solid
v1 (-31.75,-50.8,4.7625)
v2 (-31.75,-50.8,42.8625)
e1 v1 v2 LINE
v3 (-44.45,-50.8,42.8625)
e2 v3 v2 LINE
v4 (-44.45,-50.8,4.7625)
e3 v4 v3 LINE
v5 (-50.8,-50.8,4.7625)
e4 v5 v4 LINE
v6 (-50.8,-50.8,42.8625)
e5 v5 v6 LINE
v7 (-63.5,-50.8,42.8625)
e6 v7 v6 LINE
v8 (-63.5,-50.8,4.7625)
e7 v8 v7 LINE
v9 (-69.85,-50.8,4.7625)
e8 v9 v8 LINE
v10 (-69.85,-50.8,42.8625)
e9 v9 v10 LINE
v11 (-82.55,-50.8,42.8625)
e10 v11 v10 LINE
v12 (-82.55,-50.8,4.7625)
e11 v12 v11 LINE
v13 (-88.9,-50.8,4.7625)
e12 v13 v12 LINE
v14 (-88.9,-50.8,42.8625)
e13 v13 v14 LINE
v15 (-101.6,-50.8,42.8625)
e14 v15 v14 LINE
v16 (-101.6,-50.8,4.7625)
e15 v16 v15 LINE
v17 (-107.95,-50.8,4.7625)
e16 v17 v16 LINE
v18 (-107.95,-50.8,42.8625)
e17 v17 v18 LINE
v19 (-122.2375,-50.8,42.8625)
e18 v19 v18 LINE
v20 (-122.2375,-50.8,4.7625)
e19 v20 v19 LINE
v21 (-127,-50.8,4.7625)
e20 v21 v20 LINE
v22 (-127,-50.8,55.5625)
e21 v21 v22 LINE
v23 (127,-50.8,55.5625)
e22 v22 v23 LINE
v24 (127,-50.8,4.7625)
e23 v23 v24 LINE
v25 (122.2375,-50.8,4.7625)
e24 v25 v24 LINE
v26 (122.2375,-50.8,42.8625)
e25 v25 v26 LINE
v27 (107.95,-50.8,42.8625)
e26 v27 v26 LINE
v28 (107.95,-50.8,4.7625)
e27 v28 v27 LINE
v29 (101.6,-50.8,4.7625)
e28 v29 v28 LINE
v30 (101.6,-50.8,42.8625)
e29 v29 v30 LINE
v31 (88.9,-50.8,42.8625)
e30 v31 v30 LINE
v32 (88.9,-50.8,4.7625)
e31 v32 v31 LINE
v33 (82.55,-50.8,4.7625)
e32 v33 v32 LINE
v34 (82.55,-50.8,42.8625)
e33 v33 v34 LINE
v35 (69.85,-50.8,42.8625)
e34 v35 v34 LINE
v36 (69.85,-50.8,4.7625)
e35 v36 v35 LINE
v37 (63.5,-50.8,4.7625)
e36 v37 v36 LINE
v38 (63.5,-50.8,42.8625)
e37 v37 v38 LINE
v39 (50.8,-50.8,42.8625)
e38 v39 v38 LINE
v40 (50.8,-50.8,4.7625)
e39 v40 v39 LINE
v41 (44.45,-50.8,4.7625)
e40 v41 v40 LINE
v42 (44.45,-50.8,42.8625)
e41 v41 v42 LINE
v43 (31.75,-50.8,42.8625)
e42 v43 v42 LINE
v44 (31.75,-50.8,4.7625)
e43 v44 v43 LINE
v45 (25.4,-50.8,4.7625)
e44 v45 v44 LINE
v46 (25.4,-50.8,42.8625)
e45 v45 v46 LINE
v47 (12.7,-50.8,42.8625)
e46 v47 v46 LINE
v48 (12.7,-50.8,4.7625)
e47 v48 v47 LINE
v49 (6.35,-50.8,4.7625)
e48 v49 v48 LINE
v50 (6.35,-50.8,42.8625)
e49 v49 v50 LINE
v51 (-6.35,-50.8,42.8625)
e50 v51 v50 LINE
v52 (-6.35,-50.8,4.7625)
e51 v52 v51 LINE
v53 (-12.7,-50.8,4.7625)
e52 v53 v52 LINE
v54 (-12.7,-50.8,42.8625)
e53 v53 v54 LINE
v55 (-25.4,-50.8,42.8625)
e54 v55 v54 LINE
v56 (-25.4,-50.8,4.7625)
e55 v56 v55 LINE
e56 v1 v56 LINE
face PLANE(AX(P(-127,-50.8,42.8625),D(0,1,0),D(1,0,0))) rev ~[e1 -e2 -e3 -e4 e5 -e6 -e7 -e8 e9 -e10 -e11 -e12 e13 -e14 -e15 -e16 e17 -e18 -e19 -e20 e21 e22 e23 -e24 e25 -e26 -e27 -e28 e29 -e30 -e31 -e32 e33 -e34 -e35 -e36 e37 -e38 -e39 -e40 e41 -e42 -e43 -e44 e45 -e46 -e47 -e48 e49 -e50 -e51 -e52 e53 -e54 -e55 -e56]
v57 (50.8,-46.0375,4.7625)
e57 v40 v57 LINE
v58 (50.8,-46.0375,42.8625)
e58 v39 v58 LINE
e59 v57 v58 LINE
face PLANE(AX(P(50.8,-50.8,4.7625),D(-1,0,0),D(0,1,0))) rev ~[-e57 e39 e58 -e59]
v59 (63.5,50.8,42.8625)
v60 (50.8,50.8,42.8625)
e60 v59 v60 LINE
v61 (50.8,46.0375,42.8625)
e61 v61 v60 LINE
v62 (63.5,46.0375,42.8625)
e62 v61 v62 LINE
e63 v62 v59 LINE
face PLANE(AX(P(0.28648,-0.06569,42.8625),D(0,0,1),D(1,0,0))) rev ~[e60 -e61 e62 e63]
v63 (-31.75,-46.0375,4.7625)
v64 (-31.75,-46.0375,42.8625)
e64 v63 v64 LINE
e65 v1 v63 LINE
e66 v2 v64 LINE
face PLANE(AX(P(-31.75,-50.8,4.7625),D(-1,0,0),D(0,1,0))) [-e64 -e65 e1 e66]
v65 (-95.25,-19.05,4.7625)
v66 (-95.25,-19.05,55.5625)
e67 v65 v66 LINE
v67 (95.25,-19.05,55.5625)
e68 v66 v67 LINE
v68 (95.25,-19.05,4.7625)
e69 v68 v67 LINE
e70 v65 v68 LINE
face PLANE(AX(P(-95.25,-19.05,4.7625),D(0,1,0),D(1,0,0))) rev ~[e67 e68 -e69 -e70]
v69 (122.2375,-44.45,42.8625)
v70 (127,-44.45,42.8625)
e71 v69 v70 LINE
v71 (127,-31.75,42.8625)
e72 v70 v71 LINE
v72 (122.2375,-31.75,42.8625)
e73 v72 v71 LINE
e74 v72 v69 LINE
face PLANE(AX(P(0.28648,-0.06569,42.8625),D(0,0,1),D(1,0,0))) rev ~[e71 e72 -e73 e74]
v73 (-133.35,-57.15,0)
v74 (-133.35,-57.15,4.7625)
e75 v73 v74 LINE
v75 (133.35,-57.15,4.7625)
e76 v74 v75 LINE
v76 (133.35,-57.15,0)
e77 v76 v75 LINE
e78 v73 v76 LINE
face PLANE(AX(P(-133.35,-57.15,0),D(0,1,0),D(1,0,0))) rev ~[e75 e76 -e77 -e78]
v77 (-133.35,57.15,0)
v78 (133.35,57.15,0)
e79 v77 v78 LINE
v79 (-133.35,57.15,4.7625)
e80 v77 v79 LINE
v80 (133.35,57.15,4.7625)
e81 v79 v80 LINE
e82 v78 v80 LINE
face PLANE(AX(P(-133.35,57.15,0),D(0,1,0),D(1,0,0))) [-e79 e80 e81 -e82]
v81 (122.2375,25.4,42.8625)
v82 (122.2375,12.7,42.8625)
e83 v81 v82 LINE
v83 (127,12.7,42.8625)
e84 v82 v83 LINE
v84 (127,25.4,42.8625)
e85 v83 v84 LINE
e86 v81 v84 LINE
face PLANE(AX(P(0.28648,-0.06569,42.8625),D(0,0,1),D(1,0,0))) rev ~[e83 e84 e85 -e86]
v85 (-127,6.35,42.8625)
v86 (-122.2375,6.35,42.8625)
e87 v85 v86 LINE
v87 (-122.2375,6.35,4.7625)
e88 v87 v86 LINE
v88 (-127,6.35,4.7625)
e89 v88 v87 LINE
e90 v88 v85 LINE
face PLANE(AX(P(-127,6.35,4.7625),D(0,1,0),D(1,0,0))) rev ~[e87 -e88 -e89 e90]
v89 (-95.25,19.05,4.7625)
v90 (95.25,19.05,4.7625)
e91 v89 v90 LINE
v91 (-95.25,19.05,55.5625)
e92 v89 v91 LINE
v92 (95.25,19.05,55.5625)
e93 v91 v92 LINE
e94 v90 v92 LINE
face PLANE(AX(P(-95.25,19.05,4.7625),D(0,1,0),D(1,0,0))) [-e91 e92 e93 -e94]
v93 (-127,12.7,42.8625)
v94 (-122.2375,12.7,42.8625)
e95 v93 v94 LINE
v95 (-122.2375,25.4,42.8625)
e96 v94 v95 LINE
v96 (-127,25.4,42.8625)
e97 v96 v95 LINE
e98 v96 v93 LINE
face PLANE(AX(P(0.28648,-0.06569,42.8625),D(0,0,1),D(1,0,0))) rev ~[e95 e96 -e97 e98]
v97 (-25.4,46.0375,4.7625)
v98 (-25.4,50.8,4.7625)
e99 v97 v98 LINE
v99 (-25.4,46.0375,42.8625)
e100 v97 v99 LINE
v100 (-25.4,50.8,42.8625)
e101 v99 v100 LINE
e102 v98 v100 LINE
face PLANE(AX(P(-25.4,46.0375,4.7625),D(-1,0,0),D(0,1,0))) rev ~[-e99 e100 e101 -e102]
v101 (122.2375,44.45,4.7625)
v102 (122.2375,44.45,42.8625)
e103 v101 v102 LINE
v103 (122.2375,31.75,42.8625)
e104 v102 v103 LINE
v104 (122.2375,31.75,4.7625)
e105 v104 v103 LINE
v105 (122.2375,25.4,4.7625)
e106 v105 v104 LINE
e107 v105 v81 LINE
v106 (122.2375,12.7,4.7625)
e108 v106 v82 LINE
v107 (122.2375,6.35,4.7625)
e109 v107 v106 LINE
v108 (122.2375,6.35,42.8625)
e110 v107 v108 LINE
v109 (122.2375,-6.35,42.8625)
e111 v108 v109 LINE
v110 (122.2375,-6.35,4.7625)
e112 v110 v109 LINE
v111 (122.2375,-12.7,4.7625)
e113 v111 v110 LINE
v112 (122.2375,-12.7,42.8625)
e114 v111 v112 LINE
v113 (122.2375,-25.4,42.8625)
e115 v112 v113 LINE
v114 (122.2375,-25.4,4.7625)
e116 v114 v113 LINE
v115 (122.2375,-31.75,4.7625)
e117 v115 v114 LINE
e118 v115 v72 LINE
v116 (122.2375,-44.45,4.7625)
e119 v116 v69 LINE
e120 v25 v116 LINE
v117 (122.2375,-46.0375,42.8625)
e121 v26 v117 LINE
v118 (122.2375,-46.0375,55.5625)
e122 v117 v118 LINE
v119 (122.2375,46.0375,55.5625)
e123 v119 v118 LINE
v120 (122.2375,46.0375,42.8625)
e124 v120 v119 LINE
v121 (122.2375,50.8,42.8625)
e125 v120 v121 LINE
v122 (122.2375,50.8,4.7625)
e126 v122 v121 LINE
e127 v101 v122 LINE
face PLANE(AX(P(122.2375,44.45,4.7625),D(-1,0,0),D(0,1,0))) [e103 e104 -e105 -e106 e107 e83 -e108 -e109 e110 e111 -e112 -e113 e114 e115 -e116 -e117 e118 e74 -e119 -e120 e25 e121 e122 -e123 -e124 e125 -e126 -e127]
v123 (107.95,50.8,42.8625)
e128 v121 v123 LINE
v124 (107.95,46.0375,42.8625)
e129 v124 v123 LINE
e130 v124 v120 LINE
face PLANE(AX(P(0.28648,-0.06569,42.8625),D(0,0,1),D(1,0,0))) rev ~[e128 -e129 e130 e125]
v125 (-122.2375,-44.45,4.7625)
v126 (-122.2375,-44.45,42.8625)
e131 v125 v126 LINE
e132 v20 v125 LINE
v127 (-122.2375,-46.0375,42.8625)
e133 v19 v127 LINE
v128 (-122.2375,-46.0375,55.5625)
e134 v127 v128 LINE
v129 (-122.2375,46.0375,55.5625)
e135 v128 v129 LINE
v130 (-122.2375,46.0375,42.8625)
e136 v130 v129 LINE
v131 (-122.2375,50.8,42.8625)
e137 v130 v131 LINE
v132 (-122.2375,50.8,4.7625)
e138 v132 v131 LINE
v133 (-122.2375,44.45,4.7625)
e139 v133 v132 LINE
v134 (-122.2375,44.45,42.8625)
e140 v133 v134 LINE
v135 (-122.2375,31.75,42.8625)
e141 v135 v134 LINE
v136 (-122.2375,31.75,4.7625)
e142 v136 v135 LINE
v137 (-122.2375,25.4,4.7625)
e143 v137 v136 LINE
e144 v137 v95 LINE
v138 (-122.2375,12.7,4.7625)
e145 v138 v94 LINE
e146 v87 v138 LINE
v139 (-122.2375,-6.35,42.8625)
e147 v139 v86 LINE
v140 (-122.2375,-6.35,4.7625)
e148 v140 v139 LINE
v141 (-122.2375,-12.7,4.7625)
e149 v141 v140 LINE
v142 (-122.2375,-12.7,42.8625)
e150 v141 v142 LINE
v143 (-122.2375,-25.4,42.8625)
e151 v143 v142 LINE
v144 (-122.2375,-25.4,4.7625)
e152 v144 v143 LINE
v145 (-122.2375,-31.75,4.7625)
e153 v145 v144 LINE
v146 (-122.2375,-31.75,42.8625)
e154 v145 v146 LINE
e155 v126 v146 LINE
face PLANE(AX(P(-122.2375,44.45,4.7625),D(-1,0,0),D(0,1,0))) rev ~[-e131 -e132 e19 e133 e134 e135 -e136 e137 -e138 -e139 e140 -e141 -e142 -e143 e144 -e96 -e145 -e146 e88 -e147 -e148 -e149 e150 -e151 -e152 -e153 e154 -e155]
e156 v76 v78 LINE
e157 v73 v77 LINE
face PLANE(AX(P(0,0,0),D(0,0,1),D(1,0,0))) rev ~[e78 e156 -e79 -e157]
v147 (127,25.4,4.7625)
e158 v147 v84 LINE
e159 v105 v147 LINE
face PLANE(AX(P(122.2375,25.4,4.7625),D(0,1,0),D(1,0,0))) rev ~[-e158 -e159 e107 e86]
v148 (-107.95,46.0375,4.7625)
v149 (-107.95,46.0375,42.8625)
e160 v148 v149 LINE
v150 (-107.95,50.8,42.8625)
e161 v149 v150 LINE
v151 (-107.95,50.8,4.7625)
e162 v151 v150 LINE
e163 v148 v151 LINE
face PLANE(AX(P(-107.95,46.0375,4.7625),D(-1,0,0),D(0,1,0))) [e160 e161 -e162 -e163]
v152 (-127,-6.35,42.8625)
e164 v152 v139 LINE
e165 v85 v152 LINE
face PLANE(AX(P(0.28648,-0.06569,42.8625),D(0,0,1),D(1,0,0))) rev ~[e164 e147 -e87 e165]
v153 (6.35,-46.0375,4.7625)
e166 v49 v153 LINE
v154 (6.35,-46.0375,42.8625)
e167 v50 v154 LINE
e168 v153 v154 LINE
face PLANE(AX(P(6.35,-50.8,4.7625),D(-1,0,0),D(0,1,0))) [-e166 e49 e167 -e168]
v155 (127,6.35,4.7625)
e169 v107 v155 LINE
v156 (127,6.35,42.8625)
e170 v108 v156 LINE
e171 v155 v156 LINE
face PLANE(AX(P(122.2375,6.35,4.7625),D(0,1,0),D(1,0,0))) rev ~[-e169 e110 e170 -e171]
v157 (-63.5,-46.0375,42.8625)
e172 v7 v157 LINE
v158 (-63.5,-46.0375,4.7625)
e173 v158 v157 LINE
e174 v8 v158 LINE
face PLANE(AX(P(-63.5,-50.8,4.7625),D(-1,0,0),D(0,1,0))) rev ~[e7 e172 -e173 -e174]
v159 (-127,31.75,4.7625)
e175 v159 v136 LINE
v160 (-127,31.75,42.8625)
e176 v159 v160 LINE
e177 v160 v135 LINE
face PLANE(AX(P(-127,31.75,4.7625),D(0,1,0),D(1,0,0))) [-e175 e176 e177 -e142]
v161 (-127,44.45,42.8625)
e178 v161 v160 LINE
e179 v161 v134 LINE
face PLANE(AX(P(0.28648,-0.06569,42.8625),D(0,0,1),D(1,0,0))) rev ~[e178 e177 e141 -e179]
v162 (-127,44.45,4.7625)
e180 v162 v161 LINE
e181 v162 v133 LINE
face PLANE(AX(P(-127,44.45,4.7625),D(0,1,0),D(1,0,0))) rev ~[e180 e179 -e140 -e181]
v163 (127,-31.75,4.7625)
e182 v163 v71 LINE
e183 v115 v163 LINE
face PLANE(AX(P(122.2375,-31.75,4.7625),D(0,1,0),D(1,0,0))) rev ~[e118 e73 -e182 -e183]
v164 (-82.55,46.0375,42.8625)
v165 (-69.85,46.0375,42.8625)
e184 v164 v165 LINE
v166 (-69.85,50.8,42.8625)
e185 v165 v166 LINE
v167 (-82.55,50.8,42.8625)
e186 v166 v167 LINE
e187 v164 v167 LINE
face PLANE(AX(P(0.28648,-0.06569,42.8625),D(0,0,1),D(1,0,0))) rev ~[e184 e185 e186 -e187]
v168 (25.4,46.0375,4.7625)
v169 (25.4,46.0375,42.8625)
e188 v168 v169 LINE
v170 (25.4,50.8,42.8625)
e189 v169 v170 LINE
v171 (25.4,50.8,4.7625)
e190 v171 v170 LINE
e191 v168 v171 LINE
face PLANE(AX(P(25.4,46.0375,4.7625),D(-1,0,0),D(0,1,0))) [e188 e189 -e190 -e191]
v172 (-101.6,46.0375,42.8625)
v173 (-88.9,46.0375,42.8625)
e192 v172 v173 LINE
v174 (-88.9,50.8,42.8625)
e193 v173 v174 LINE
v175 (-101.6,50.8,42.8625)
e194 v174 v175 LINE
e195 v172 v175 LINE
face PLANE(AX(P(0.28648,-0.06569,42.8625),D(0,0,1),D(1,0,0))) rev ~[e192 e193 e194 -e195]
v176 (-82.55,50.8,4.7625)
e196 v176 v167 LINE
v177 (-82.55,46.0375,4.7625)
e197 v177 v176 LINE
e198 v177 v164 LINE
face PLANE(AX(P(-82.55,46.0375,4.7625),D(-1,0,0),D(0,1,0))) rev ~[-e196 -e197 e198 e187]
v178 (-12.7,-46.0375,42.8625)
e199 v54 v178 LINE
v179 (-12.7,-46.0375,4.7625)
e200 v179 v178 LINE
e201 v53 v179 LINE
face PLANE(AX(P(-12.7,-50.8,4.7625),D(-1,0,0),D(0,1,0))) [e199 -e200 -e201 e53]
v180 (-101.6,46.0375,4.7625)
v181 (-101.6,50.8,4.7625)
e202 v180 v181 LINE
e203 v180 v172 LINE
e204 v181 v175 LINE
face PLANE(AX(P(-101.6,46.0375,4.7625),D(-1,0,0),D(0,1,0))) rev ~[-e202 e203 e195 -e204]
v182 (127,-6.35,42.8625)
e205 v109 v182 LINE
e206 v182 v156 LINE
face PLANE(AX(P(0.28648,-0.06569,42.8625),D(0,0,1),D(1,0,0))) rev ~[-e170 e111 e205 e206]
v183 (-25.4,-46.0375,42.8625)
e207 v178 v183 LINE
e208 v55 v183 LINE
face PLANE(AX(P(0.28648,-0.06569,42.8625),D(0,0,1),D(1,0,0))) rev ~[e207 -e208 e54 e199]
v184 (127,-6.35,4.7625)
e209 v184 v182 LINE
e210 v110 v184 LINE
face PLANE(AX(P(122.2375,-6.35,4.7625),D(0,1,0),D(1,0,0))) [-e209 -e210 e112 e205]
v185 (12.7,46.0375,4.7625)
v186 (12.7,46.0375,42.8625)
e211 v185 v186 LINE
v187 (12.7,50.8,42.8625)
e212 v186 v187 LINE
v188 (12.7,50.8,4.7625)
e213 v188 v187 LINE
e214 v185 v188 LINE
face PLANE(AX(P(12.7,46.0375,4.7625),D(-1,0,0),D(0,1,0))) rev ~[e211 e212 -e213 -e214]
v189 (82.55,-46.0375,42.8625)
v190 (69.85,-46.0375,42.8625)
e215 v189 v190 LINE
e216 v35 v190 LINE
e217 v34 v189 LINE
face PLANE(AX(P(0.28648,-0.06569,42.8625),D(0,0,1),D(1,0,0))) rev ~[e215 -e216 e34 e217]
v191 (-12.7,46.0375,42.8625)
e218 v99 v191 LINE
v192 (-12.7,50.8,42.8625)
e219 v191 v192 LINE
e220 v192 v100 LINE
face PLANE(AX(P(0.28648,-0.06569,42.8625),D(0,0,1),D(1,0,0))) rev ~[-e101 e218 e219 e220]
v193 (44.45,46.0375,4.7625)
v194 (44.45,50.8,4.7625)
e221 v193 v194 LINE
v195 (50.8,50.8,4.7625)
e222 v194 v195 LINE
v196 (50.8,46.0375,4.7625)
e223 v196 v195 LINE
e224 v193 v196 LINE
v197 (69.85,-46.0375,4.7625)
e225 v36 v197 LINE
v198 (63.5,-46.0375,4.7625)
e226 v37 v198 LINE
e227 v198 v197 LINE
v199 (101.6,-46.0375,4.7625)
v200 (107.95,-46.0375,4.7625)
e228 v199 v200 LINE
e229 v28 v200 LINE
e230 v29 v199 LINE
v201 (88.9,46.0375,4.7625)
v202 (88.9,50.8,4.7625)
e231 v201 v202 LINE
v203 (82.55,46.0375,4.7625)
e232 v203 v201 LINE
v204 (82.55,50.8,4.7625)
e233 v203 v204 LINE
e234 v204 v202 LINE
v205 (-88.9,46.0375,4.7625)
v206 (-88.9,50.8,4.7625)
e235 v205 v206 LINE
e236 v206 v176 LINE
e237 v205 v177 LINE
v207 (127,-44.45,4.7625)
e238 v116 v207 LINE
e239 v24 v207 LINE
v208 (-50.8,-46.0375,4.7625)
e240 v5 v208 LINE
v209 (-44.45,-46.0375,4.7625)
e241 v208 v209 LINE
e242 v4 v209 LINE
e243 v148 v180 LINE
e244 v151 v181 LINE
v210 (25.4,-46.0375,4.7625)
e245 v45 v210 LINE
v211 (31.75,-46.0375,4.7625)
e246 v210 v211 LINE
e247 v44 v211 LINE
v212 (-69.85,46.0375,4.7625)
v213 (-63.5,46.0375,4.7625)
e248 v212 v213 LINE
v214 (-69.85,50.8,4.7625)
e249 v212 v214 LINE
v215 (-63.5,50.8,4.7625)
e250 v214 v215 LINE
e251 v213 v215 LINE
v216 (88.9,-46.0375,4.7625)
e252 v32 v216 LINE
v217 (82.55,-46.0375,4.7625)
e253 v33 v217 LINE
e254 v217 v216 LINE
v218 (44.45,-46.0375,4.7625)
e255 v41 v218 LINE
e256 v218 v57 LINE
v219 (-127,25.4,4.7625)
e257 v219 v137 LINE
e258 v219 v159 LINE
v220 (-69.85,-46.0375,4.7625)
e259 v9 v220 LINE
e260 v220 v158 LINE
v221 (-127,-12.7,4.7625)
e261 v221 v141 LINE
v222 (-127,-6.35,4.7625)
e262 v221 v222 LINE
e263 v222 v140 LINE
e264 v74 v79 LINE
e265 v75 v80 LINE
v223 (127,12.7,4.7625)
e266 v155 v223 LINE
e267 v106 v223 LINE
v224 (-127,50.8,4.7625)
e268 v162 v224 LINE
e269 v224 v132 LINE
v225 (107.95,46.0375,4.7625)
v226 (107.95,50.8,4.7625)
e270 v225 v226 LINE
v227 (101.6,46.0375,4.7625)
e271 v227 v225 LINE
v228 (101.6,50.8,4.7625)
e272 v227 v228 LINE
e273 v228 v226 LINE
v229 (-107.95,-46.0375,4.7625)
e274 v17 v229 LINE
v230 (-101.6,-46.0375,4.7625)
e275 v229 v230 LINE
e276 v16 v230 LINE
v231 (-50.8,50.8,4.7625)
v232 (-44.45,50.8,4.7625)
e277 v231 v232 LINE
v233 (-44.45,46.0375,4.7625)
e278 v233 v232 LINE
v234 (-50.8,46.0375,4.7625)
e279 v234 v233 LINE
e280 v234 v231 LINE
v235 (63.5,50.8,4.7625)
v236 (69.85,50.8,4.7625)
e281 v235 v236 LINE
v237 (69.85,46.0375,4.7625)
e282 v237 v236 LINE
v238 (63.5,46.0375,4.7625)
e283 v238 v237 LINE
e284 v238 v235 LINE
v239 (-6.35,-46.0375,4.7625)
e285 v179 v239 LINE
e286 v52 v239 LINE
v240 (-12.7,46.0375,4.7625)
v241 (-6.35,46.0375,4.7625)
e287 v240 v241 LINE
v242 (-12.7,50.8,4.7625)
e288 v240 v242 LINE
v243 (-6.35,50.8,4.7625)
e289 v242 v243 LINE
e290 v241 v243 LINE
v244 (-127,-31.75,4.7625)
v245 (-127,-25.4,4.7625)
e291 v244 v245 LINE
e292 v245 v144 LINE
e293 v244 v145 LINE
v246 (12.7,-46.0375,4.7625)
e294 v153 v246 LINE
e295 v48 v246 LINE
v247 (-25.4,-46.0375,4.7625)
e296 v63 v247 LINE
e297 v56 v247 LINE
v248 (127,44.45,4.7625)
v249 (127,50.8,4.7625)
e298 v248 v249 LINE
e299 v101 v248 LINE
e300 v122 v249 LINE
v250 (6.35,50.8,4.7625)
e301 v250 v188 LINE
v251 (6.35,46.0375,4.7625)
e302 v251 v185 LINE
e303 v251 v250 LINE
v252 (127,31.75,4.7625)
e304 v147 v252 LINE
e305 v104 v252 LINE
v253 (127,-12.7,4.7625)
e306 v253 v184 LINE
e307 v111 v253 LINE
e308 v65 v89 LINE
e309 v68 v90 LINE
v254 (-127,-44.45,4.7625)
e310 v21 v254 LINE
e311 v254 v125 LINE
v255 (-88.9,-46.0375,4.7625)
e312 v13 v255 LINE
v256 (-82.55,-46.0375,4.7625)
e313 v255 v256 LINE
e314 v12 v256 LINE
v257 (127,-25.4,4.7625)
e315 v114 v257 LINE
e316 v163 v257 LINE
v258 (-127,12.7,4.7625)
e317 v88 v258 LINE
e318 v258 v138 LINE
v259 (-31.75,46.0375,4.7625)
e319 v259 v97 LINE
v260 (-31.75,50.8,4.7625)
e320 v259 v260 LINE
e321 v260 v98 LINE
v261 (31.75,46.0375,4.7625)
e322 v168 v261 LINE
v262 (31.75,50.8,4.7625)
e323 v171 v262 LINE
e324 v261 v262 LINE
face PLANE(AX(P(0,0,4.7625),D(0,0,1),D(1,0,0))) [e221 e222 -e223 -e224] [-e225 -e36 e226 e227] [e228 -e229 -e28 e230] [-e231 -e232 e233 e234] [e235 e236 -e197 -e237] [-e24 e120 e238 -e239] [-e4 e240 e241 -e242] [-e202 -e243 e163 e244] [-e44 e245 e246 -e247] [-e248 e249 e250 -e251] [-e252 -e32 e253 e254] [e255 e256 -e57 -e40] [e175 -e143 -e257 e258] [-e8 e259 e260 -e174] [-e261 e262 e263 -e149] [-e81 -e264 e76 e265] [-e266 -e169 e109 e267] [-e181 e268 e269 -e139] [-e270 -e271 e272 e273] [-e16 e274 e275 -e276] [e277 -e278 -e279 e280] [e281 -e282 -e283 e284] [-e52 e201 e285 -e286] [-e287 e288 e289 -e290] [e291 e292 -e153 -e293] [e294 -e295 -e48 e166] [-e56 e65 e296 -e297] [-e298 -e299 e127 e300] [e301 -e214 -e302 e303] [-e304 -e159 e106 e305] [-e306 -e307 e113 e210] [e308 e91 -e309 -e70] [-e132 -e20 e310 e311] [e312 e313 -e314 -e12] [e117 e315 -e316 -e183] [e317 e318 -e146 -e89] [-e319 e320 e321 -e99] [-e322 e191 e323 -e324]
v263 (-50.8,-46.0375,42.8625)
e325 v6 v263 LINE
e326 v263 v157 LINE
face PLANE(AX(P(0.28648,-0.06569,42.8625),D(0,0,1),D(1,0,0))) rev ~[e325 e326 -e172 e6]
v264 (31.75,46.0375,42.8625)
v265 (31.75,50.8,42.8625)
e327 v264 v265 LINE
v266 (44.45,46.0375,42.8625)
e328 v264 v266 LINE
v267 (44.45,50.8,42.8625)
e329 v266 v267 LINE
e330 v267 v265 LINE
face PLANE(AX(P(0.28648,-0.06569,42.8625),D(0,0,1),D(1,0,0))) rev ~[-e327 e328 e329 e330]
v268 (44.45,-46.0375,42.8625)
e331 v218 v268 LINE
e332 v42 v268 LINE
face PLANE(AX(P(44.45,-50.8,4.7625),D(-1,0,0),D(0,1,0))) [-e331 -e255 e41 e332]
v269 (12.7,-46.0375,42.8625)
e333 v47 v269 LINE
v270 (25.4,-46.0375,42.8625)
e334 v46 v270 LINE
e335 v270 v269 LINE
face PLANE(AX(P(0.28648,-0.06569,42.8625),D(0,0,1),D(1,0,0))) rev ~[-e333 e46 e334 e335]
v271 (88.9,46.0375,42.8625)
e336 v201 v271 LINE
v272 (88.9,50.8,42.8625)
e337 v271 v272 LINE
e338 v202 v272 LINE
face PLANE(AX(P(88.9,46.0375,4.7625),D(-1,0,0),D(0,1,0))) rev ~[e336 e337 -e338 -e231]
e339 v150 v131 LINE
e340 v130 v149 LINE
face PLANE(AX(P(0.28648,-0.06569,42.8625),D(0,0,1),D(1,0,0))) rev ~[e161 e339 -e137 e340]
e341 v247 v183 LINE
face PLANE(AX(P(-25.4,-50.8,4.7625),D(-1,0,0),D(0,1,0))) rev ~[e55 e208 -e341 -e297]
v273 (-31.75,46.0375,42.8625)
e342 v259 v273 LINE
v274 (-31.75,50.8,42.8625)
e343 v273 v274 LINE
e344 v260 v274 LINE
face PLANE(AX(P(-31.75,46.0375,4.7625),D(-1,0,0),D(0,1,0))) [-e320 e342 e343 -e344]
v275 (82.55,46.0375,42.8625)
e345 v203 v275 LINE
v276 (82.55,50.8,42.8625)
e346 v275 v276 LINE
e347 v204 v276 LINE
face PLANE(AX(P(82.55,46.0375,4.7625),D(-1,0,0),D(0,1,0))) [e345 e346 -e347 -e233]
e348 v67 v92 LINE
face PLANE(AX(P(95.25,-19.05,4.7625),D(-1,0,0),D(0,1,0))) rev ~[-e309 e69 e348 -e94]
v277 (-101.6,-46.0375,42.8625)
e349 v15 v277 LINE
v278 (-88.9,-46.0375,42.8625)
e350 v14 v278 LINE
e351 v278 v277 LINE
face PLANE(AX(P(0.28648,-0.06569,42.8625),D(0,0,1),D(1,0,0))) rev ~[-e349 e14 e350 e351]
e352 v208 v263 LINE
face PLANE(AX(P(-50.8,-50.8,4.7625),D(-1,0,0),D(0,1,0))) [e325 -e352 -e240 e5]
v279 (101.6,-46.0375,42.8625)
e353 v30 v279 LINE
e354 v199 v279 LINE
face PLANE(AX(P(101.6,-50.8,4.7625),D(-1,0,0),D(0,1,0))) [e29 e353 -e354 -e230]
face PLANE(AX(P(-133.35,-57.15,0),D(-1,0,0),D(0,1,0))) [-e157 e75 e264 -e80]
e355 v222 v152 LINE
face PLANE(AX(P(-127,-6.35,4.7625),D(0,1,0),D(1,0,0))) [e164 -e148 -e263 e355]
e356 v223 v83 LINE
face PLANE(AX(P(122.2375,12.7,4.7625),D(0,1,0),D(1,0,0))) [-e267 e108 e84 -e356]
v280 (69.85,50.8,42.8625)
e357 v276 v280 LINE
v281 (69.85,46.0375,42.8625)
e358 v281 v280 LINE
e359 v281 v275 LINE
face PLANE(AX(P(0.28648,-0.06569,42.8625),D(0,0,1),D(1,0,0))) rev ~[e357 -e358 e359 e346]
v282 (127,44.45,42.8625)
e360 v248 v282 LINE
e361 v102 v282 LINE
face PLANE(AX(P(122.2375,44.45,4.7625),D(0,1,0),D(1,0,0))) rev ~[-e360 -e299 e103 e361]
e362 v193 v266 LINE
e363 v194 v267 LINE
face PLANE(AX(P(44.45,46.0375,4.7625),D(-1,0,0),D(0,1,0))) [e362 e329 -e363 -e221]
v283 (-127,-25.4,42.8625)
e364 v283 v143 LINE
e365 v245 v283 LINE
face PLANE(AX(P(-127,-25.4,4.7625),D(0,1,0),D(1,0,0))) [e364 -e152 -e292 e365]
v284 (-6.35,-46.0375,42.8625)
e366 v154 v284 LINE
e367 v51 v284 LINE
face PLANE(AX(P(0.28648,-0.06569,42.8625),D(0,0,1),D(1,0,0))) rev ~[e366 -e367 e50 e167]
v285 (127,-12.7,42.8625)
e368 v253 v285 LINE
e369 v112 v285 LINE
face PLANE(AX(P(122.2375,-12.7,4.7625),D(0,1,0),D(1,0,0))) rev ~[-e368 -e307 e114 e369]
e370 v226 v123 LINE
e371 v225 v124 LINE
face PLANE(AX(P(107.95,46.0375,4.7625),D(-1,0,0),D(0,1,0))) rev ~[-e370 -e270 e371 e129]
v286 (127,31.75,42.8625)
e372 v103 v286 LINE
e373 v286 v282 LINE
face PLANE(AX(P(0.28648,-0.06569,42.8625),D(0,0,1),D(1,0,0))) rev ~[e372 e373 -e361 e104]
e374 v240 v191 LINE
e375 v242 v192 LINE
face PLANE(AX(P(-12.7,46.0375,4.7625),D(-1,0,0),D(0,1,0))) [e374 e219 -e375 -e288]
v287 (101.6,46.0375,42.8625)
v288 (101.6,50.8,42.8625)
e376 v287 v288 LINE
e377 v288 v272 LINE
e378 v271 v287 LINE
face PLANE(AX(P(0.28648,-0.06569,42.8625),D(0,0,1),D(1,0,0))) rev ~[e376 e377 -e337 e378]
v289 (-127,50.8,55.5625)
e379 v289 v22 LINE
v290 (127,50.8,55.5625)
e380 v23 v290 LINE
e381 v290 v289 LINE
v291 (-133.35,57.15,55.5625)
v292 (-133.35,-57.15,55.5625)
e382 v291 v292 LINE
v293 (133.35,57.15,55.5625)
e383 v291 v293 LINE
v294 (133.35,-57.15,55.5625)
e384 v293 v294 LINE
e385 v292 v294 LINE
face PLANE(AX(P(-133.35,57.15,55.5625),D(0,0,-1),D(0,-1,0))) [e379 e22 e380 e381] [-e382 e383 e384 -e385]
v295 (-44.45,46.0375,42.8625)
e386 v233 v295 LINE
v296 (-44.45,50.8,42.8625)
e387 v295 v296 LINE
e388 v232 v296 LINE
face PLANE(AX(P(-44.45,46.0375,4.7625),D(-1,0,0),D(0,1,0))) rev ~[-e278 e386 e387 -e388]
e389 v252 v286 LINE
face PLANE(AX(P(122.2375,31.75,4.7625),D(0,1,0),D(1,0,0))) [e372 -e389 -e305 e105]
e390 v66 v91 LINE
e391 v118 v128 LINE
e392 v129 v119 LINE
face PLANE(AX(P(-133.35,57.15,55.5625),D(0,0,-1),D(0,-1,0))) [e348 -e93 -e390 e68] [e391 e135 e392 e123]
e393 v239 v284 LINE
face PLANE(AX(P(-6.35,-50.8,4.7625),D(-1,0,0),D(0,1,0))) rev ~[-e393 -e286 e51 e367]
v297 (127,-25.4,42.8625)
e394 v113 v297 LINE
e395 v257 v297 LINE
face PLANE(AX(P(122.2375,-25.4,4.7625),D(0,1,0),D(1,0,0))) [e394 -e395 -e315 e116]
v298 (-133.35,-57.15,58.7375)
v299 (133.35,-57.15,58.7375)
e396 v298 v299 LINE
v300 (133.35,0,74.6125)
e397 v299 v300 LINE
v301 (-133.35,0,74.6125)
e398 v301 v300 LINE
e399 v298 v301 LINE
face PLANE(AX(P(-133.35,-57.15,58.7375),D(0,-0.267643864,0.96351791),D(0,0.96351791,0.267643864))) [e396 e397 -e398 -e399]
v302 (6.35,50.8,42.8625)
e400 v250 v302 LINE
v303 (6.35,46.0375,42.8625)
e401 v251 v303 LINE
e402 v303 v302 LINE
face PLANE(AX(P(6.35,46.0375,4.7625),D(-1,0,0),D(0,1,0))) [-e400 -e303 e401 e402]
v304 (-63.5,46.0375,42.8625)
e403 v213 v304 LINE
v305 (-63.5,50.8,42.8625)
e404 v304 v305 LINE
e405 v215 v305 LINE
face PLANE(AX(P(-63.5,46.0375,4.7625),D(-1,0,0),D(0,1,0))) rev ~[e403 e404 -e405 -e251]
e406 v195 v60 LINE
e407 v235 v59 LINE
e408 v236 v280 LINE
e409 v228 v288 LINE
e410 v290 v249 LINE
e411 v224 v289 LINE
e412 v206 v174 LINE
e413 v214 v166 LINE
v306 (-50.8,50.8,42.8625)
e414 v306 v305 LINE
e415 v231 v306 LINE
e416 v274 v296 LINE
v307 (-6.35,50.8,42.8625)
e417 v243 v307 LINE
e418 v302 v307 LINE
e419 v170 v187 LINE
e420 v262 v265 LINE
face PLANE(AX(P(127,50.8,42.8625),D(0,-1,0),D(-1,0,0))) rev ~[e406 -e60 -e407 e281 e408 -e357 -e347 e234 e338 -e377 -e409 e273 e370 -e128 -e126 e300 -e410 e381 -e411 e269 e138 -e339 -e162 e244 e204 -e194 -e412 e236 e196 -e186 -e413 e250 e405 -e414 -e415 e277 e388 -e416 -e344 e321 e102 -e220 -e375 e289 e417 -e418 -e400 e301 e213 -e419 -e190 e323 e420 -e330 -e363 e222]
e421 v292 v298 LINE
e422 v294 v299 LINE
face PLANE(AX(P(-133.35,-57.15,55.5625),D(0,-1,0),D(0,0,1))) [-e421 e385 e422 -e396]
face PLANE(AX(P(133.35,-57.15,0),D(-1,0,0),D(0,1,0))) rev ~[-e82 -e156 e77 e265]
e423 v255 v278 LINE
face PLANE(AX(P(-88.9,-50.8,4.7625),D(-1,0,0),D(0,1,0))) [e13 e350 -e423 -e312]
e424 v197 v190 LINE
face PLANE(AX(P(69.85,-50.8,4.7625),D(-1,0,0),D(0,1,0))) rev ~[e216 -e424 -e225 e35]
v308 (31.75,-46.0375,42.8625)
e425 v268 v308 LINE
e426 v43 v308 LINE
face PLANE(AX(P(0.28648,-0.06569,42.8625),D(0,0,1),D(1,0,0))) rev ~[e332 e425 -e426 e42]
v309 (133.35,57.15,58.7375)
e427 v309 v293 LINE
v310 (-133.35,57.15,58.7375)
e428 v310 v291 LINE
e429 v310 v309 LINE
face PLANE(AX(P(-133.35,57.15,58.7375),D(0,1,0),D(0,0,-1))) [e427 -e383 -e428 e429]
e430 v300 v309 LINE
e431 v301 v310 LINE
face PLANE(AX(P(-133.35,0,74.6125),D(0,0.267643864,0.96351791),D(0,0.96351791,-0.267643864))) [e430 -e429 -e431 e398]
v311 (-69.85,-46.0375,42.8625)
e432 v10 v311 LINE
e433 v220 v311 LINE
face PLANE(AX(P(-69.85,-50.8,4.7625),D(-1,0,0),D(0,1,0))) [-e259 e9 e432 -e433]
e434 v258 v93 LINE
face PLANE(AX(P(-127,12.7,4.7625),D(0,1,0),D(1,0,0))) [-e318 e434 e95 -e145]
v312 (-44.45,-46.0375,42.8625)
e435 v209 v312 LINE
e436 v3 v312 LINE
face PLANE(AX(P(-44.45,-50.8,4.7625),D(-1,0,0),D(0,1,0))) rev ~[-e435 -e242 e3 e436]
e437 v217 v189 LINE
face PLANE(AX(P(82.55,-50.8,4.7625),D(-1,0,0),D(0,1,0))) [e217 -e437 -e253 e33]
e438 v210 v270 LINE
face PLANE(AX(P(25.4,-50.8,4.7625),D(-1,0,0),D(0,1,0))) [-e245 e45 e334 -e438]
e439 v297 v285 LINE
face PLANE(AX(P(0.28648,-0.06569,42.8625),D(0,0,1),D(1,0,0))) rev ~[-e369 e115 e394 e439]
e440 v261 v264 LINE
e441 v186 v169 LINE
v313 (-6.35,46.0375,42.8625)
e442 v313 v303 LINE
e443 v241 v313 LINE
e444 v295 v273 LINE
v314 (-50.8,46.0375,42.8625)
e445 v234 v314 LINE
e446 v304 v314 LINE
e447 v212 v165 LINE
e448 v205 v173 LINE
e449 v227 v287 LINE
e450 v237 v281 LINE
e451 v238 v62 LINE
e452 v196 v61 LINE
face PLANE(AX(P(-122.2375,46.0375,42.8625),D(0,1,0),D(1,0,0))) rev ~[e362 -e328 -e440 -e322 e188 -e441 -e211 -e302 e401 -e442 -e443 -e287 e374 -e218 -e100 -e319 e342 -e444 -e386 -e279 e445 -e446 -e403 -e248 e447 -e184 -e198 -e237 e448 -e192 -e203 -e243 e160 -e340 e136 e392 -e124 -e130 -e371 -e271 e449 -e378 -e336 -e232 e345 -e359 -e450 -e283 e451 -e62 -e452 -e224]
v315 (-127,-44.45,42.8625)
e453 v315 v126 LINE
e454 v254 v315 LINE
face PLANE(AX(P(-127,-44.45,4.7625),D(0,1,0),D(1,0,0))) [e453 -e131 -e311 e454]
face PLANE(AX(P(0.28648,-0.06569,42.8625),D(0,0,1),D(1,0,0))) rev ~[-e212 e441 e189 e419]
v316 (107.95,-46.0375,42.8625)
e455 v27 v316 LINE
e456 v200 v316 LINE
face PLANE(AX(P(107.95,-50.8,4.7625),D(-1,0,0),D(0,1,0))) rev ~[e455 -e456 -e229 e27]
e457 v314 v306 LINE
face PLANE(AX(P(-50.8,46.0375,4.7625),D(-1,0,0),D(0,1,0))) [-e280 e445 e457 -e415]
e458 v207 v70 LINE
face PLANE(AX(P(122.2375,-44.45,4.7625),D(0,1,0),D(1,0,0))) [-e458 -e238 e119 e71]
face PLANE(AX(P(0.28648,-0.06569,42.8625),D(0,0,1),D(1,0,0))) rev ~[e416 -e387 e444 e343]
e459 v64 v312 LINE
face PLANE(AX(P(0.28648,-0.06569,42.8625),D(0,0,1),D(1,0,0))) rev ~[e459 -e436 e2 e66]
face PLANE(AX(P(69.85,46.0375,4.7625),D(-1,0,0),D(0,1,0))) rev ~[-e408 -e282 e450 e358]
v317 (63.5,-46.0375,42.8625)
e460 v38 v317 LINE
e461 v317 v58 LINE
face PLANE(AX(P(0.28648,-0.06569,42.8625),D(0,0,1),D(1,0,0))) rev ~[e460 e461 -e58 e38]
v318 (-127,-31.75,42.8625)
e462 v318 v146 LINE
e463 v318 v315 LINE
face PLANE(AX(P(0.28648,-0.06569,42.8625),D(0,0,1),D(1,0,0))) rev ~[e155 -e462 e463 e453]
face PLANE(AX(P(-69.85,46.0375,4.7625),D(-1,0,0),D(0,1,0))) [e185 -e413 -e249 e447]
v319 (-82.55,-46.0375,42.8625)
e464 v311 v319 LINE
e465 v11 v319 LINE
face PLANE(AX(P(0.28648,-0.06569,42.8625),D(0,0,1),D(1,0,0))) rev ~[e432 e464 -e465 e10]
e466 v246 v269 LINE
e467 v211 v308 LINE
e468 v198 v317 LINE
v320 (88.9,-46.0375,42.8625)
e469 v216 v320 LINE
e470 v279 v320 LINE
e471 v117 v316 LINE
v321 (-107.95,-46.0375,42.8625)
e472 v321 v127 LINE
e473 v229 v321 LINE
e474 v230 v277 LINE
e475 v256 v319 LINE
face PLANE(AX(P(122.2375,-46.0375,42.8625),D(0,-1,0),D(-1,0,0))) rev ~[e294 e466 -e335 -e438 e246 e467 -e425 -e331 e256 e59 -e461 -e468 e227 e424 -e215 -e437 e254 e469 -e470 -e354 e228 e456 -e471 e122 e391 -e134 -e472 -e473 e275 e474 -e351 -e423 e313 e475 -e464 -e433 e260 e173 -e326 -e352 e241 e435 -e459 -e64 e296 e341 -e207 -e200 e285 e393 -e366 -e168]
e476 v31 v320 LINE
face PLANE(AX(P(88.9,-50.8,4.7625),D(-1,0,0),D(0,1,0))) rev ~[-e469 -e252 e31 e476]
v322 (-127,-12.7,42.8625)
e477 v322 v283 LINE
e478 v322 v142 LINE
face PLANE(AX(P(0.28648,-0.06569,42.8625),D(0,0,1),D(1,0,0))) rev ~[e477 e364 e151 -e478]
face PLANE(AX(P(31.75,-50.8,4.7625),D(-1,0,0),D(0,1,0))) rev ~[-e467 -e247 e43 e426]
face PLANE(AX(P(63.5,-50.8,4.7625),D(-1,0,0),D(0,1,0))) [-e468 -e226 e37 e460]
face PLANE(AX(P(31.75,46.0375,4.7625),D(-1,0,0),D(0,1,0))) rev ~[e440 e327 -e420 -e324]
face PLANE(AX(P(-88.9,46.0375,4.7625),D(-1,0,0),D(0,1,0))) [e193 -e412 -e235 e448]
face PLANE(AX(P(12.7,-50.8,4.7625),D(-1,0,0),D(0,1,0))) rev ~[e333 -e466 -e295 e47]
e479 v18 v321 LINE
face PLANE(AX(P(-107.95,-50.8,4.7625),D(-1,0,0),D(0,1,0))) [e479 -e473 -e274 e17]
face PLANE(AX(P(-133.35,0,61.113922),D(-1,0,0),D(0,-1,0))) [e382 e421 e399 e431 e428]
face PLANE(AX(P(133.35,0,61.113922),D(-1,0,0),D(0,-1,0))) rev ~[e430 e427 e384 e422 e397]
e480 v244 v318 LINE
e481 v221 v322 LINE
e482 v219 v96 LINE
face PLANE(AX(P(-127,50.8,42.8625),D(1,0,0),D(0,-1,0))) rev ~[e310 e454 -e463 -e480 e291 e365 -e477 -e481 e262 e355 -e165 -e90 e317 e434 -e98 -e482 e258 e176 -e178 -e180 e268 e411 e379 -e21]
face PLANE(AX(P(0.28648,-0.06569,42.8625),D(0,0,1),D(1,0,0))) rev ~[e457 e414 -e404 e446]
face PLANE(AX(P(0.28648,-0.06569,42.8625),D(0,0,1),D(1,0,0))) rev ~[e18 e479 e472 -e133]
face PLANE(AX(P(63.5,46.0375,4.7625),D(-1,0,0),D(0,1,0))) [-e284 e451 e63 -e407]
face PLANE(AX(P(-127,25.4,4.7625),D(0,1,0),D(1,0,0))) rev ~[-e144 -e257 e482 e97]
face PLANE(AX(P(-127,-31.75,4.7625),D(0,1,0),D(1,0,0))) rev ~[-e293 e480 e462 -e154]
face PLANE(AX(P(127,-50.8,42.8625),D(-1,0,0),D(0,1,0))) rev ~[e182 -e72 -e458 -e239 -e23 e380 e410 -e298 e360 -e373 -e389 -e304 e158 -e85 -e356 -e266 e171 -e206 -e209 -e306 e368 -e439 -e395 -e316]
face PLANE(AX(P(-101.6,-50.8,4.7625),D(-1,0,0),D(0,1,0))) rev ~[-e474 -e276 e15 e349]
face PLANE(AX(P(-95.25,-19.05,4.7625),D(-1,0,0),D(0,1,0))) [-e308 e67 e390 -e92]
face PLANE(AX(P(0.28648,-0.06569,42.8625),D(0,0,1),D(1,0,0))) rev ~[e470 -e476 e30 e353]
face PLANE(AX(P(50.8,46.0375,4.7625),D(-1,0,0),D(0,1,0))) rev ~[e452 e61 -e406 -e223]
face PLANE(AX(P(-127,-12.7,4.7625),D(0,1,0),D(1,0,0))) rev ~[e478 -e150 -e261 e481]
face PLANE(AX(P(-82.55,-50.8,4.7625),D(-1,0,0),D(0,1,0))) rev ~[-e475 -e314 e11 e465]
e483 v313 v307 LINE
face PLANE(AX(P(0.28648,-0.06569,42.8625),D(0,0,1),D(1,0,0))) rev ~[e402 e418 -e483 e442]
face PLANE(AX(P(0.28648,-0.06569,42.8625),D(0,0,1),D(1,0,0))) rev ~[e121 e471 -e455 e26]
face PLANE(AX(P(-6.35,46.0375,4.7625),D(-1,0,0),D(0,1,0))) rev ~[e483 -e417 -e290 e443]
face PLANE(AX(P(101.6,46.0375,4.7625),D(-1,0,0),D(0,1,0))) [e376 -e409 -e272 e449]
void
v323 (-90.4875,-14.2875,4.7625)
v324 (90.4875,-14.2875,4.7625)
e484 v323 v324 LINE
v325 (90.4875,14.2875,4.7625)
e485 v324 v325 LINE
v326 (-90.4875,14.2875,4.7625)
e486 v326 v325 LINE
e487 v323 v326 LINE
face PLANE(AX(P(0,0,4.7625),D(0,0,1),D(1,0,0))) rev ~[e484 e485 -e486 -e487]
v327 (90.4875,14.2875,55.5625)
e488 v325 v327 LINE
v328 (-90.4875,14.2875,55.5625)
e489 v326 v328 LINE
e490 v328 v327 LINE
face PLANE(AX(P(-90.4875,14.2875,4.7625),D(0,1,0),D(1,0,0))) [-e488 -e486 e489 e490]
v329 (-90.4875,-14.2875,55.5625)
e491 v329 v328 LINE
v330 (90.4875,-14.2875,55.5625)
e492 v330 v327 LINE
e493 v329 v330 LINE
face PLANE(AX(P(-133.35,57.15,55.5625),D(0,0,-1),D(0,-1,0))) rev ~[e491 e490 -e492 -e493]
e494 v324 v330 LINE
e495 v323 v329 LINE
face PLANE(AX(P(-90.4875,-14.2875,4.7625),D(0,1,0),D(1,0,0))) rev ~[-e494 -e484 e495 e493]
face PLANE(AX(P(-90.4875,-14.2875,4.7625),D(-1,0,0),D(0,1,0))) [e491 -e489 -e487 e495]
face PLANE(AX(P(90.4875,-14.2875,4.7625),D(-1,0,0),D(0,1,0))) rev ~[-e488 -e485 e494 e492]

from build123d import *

# Parameters (mm, degrees)
F0_W     = 266.7
F0_H     = 114.3
F1_DEPTH = 4.7625
F2_W     = 4.7625
F2_H     = 6.35
F2_W_2   = 6.35
F2_H_2   = 4.7625
F3_DEPTH = 38.1
F4_W     = 190.5
F4_H     = 38.1
F4_W_2   = 180.975
F4_H_2   = 28.575
F5_DEPTH = 50.8
F6_W     = 4.7625
F6_H     = 6.35
F7_DEPTH = 12.7
F9_DEPTH = 266.7


# Not quite as in the source:
# - a feature names something its author has since deleted; it is built from what else it names


with BuildPart() as f1:
    # F0 (on Top) → F1 (new body)
    with BuildSketch(Plane.XY):
        Rectangle(F0_W, F0_H)
    extrude(amount=F1_DEPTH)

    # F2 (on face) → F3 (join)
    with BuildSketch(Plane.XY.offset(4.7625)):
        with Locations((-124.61875, -47.625)):
            Rectangle(F2_W, F2_H)
        with Locations((-124.61875, -9.525)):
            Rectangle(F2_W, F2_H)
        with Locations((-124.61875, 9.525)):
            Rectangle(F2_W, F2_H)
        with Locations((-124.61875, 28.575)):
            Rectangle(F2_W, F2_H)
        with Locations((-124.61875, 47.625)):
            Rectangle(F2_W, F2_H)
        with Locations((124.61875, 47.625)):
            Rectangle(F2_W, F2_H)
        with Locations((124.61875, -47.625)):
            Rectangle(F2_W, F2_H)
        with Locations((124.61875, 28.575)):
            Rectangle(F2_W, F2_H)
        with Locations((124.61875, 9.525)):
            Rectangle(F2_W, F2_H)
        with Locations((124.61875, -9.525)):
            Rectangle(F2_W, F2_H)
        with Locations((124.61875, -28.575)):
            Rectangle(F2_W, F2_H)
        with Locations((-104.775, 48.41875)):
            Rectangle(F2_W_2, F2_H_2)
        with Locations((-85.725, 48.41875)):
            Rectangle(F2_W_2, F2_H_2)
        with Locations((-66.675, 48.41875)):
            Rectangle(F2_W_2, F2_H_2)
        with Locations((-47.625, 48.41875)):
            Rectangle(F2_W_2, F2_H_2)
        with Locations((-28.575, 48.41875)):
            Rectangle(F2_W_2, F2_H_2)
        with Locations((-9.525, 48.41875)):
            Rectangle(F2_W_2, F2_H_2)
        with Locations((9.525, 48.41875)):
            Rectangle(F2_W_2, F2_H_2)
        with Locations((28.575, 48.41875)):
            Rectangle(F2_W_2, F2_H_2)
        with Locations((47.625, 48.41875)):
            Rectangle(F2_W_2, F2_H_2)
        with Locations((66.675, 48.41875)):
            Rectangle(F2_W_2, F2_H_2)
        with Locations((85.725, 48.41875)):
            Rectangle(F2_W_2, F2_H_2)
        with Locations((104.775, 48.41875)):
            Rectangle(F2_W_2, F2_H_2)
        with Locations((-124.61875, -28.575)):
            Rectangle(F2_W, F2_H)
        with Locations((-85.725, -48.41875)):
            Rectangle(F2_W_2, F2_H_2)
        with Locations((-104.775, -48.41875)):
            Rectangle(F2_W_2, F2_H_2)
        with Locations((-66.675, -48.41875)):
            Rectangle(F2_W_2, F2_H_2)
        with Locations((-47.625, -48.41875)):
            Rectangle(F2_W_2, F2_H_2)
        with Locations((-28.575, -48.41875)):
            Rectangle(F2_W_2, F2_H_2)
        with Locations((-9.525, -48.41875)):
            Rectangle(F2_W_2, F2_H_2)
        with Locations((9.525, -48.41875)):
            Rectangle(F2_W_2, F2_H_2)
        with Locations((28.575, -48.41875)):
            Rectangle(F2_W_2, F2_H_2)
        with Locations((47.625, -48.41875)):
            Rectangle(F2_W_2, F2_H_2)
        with Locations((66.675, -48.41875)):
            Rectangle(F2_W_2, F2_H_2)
        with Locations((85.725, -48.41875)):
            Rectangle(F2_W_2, F2_H_2)
        with Locations((104.775, -48.41875)):
            Rectangle(F2_W_2, F2_H_2)
    extrude(amount=F3_DEPTH)

    # F4 (on face) → F5 (join)
    with BuildSketch(Plane.XY.offset(4.7625)):
        Rectangle(F4_W, F4_H)
        Rectangle(F4_W_2, F4_H_2, mode=Mode.SUBTRACT)
    extrude(amount=F5_DEPTH)

    # F6 (on face) → F7 (join)
    with BuildSketch(Plane.XY.offset(42.8625)):
        Polygon((127, 50.8), (-127, 50.8), (-127, 31.75), (-122.2375, 31.75), (-122.2375, 46.0375), (122.2375, 46.0375), (122.2375, -46.0375), (-122.2375, -46.0375), (-122.2375, 25.4), (-127, 25.4), (-127, -50.8), (127, -50.8), align=None)
        with Locations((-124.61875, 28.575)):
            Rectangle(F6_W, F6_H)
    extrude(amount=F7_DEPTH)

    # F8 (on face) → F9 (join, through all)
    with BuildSketch(Plane(origin=(-133.35, 0, 0), x_dir=(0, -1, 0), z_dir=(-1, 0, 0))):
        Polygon((-57.15, 55.5625), (-50.8, 55.5625), (50.8, 55.5625), (57.15, 55.5625), (57.15, 58.7375), (0, 74.6125), (-57.15, 58.7375), align=None)
    extrude(amount=-F9_DEPTH)


solid = f1.part
